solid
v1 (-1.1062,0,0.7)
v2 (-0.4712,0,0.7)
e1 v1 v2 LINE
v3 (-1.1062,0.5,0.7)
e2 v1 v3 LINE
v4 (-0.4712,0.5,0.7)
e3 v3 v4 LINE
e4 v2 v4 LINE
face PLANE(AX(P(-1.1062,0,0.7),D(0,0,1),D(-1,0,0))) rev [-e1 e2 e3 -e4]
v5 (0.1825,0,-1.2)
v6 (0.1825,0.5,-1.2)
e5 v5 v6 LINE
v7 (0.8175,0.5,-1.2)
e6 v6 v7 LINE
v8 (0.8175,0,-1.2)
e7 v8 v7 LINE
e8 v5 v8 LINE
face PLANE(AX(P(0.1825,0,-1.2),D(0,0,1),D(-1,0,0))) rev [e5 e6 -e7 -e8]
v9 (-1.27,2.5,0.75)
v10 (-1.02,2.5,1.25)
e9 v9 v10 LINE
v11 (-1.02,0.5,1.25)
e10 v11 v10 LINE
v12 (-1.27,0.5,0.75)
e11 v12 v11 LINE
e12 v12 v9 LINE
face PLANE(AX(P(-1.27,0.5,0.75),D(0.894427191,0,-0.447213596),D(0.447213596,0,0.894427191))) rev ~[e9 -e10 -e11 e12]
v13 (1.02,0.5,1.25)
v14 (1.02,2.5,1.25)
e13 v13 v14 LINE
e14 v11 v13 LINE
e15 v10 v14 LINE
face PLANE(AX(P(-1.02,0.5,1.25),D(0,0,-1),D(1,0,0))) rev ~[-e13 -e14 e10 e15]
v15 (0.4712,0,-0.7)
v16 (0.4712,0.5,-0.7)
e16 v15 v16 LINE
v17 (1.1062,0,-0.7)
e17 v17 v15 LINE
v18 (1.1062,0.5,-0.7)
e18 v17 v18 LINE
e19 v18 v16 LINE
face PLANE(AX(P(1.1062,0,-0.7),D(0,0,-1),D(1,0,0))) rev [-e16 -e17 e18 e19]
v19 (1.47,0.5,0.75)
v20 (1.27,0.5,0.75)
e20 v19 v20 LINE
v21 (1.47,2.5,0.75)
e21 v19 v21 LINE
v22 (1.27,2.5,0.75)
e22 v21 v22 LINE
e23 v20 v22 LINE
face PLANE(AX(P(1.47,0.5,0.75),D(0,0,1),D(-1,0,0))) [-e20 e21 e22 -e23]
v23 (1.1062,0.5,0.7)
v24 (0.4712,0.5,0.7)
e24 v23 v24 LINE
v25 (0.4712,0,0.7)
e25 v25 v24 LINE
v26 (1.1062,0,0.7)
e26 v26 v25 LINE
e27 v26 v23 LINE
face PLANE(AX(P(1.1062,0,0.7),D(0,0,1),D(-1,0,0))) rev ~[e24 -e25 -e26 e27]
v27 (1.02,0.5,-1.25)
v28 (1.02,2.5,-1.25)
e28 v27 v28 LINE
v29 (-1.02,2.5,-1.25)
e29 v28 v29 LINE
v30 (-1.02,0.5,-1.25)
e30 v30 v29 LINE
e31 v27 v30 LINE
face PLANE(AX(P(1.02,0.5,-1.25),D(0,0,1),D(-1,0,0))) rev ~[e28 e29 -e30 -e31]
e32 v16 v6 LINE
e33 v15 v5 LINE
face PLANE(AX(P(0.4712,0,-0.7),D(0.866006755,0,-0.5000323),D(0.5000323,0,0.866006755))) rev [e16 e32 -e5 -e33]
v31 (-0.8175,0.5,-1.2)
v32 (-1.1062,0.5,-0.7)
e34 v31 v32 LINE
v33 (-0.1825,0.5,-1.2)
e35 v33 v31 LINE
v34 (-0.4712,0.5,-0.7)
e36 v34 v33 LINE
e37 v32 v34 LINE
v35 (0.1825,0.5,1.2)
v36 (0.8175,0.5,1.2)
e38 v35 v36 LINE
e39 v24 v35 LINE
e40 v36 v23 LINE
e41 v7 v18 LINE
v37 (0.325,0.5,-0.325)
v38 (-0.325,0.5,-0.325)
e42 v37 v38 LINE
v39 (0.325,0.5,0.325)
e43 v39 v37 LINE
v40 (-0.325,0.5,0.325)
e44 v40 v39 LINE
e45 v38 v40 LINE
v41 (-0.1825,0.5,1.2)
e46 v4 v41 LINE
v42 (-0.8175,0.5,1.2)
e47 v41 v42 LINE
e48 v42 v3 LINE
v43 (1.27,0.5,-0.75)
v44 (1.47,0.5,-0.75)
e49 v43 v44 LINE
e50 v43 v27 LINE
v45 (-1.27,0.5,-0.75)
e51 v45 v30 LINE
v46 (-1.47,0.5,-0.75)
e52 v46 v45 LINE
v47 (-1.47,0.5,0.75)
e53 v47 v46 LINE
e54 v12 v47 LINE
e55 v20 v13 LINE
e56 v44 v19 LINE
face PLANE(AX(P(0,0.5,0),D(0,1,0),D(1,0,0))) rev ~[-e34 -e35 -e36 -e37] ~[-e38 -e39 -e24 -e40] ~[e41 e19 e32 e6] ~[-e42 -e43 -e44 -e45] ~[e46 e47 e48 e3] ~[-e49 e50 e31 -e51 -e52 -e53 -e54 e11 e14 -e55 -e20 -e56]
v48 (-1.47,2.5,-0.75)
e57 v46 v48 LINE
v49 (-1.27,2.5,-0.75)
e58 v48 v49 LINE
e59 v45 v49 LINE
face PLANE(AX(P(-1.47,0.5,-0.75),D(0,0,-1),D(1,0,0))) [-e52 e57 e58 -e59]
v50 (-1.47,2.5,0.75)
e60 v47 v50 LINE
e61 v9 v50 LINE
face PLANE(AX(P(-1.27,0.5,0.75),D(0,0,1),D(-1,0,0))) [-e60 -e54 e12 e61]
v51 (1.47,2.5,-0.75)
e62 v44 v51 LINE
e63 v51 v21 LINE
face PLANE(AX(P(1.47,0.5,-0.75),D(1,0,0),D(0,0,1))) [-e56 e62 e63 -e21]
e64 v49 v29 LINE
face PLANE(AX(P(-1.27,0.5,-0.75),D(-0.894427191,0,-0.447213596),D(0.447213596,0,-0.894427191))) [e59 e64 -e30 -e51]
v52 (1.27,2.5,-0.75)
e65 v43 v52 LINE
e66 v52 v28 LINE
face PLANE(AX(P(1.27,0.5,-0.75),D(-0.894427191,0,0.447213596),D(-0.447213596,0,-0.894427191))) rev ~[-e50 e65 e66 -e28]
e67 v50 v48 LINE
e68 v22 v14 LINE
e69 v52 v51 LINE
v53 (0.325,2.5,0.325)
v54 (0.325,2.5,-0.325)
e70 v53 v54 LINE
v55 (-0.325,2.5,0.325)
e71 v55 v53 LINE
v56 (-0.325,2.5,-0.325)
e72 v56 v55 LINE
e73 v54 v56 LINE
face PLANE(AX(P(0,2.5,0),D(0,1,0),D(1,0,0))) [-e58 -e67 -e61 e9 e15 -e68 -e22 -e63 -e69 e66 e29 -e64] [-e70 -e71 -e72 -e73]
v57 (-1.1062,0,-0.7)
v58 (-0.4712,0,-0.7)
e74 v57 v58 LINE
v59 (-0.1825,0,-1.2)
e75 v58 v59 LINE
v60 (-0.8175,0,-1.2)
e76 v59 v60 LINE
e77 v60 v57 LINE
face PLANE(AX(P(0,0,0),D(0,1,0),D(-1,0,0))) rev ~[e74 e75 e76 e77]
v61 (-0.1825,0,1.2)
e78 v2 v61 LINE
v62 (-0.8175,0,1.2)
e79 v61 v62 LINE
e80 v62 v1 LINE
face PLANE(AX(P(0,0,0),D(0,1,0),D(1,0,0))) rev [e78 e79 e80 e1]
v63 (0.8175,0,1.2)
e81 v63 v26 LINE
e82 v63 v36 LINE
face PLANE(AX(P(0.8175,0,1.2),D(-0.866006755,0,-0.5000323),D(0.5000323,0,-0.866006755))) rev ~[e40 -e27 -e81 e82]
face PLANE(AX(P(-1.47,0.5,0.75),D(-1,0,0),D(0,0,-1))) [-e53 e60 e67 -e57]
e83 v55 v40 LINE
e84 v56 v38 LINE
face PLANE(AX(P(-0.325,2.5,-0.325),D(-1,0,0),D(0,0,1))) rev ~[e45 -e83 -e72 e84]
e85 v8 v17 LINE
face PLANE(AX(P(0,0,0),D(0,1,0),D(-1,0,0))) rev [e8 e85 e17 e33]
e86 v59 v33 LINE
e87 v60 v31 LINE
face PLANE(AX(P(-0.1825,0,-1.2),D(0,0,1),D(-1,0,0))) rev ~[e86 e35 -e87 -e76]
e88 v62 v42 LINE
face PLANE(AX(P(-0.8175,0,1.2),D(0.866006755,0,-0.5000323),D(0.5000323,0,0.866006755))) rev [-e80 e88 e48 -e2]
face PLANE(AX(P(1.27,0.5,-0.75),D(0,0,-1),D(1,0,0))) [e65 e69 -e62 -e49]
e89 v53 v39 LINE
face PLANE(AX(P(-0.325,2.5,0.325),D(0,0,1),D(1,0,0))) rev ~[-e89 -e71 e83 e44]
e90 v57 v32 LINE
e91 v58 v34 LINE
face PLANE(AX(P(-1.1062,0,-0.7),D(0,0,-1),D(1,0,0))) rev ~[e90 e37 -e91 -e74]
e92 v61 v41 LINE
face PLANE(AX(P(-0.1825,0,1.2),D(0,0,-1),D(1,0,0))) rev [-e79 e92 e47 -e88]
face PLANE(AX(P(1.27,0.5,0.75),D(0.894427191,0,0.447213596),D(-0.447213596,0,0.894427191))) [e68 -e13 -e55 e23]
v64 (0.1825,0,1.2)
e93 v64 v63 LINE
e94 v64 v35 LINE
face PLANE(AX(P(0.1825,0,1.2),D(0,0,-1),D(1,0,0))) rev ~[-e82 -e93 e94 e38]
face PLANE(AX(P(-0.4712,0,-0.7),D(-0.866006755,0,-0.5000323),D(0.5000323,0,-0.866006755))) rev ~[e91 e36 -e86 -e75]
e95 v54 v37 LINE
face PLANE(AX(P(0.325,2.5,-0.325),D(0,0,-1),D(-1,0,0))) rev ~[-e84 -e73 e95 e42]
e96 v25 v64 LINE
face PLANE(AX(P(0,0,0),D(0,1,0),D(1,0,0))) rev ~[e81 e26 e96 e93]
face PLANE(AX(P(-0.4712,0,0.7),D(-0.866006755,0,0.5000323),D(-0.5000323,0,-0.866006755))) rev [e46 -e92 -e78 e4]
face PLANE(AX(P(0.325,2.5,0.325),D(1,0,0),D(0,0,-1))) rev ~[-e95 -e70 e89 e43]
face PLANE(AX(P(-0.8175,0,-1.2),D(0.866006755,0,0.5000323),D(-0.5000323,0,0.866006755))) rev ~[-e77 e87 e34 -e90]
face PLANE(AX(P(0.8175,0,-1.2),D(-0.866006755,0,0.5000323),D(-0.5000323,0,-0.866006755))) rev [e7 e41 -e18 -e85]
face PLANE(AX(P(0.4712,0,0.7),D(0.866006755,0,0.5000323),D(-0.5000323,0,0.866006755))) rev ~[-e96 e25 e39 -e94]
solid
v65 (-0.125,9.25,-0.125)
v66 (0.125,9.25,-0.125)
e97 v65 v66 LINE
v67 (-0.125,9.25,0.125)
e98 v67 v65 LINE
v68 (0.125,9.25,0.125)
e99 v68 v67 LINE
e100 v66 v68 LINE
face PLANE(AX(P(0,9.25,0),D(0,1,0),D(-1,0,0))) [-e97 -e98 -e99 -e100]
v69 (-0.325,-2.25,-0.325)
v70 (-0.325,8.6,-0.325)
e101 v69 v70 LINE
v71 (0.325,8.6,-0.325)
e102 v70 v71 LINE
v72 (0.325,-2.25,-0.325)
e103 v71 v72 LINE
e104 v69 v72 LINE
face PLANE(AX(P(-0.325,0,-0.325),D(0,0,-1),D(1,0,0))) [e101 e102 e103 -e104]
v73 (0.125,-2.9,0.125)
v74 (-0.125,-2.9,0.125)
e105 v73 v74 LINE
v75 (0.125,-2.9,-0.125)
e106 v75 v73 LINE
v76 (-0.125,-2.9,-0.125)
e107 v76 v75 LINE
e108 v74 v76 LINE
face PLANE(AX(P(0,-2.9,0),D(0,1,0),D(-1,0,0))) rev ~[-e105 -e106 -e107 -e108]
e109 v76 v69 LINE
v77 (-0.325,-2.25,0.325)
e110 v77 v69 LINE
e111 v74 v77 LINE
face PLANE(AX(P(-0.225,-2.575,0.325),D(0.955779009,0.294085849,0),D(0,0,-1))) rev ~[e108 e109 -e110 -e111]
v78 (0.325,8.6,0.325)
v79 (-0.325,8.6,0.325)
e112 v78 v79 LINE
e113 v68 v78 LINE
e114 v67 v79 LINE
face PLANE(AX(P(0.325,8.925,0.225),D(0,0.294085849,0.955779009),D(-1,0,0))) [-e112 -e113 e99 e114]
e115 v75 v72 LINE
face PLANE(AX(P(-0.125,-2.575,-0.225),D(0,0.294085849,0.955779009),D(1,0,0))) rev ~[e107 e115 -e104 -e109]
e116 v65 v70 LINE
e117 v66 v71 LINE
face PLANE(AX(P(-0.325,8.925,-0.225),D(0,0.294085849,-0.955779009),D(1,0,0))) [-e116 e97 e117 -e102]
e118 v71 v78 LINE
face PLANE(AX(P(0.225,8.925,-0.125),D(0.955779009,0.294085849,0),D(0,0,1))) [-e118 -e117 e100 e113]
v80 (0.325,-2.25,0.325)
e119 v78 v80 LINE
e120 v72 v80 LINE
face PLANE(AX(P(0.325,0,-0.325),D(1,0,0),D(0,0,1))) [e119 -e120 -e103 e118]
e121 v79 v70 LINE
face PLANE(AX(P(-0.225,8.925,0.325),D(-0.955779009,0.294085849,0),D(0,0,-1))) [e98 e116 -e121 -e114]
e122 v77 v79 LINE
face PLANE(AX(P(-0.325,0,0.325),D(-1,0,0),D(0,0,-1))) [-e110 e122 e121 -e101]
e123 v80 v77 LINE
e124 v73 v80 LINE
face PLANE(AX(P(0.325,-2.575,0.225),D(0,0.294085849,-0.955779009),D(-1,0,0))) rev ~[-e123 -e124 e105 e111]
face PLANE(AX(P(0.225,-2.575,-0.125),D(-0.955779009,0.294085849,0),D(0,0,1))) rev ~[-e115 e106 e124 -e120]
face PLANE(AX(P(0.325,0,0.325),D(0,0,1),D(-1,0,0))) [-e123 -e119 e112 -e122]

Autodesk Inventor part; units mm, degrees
ref_plane "YZ Plane" through (0, 0, 0) normal (1, 0, 0) x (0, 1, 0)
ref_plane "XZ Plane" through (0, 0, 0) normal (0, 1, 0) x (-1, 0, 0)
ref_plane "XY Plane" through (0, 0, 0) normal (0, 0, 1) x (1, 0, 0)
sketch "Sketch1" plane through (0, 0, 0) normal (0, 1, 0) x (-1, 0, 0)
  line L0 (1.02, 1.25) -> (1.27, 0.75)
  line L1 (-1.02, 1.25) -> (1.02, 1.25)
  line L2 (-1.27, -0.75) -> (-1.27, 0.75)
  line L3 (-1.02, -1.25) -> (-1.27, -0.75)
  line L4 (1.02, -1.25) -> (-1.02, -1.25)
  line L5 (1.27, -0.75) -> (1.02, -1.25)
  line L6 (1.27, 0.75) -> (1.27, -0.75)
  line L7 (1.02, 1.25) -> (1.27, 0.75)
  line L8 (-1.02, 1.25) -> (1.02, 1.25)
  line L9 (-1.27, 0.75) -> (-1.02, 1.25)
  line L10 (0.815, 1.2) -> (0.18, 1.2)
  line L11 (1.1037, 0.7) -> (0.815, 1.2)
  line L12 (0.4687, 0.7) -> (1.1037, 0.7)
  line L13 (0.18, 1.2) -> (0.4687, 0.7)
  line L14 (-0.815, 1.2) -> (-1.1037, 0.7)
  line L15 (-0.18, 1.2) -> (-0.815, 1.2)
  line L16 (-0.4687, 0.7) -> (-0.18, 1.2)
  line L17 (-1.1037, 0.7) -> (-0.4687, 0.7)
  line L18 (0.815, -1.2) -> (1.1037, -0.7)
  line L19 (0.18, -1.2) -> (0.815, -1.2)
  line L20 (0.4687, -0.7) -> (0.18, -1.2)
  line L21 (1.1037, -0.7) -> (0.4687, -0.7)
  line L22 (-0.815, -1.2) -> (-0.18, -1.2)
  line L23 (-1.1037, -0.7) -> (-0.815, -1.2)
  line L24 (-0.4687, -0.7) -> (-1.1037, -0.7)
  line L25 (-0.18, -1.2) -> (-0.4687, -0.7)
  line L26 (-0.325, 0.325) -> (0.325, 0.325)
  line L27 (0.325, 0.325) -> (0.325, -0.325)
  line L28 (-0.325, -0.325) -> (0.325, -0.325)
  line L29 (-0.325, 0.325) -> (-0.325, -0.325)
  point P0 (0, 0)
  point P1 (0, 0)
sketch "Sketch3" plane through (0, 0, 0) normal (0, 1, 0) x (-1, 0, 0)
  line L0 (1.1062, -0.7) -> (0.4712, -0.7)
  line L1 (0.4712, -0.7) -> (0.1825, -1.2)
  line L2 (0.1825, -1.2) -> (0.8175, -1.2)
  line L3 (0.8175, -1.2) -> (1.1062, -0.7)
  line L4 (0.5, -1.2) -> (0.5, -0.7) construction
  point P0 (0, 0)
  dimension "d58" = 120
  dimension "d60" = 0.7
  dimension "d61" = 0.635
  dimension "d62" = 0.5
  dimension "d65" = 0.5
extrude "PCB-Level" add sketch "Sketch3" along normal blind 0.5
mirror "PCB-Level-Mirror1" about plane through (0, 0, 0) normal (1, 0, 0) of "PCB-Level"
mirror "PCB_Level-Mirror2" about plane through (0, 0, 0) normal (0, 0, 1) of "PCB-Level", "PCB-Level-Mirror1"
sketch "Sketch4" plane through (0, 0.5, 0) normal (0, 1, 0) x (1, 0, 0)
  line L0 (-1.02, -1.25) -> (1.02, -1.25)
  line L1 (1.27, -0.75) -> (1.27, 0.75)
  line L2 (1.02, 1.25) -> (-1.02, 1.25)
  line L3 (-1.27, 0.75) -> (-1.27, -0.75)
  line L4 (-1.27, -1.25) -> (1.27, 1.25) construction
  line L5 (1.27, -1.25) -> (-1.27, 1.25) construction
  line L6 (1.27, -0.75) -> (1.02, -1.25)
  line L7 (1.27, 0.75) -> (1.02, 1.25)
  line L8 (-1.27, 0.75) -> (-1.02, 1.25)
  line L9 (-1.27, -0.75) -> (-1.02, -1.25)
  line L10 (-1.02, -1.25) -> (1.02, -1.25)
  line L11 (1.27, 0.75) -> (1.47, 0.75)
  line L12 (1.47, 0.75) -> (1.47, -0.75)
  line L13 (1.47, -0.75) -> (1.27, -0.75)
  line L14 (1.27, -0.75) -> (1.27, 0.75)
  line L15 (-1.27, -0.75) -> (-1.47, -0.75)
  line L16 (-1.47, -0.75) -> (-1.47, 0.75)
  line L17 (-1.47, 0.75) -> (-1.27, 0.75)
  line L18 (-1.27, 0.75) -> (-1.27, -0.75)
  point P0 (0, 0)
  dimension "d68" = 2.54
  dimension "d69" = 2.5
  dimension "d70" = 0.5
  dimension "d71" = 0.25
  dimension "d72" = 0.5
  dimension "d73" = 0.25
  dimension "d74" = 0.5
  dimension "d75" = 0.25
  dimension "d76" = 0.5
  dimension "d77" = 0.25
  dimension "d122" = 0.2
  dimension "d123" = 0.2
sketch "Sketch6" plane through (0, 0, 0) normal (0, 1, 0) x (-1, 0, 0)
  line L0 (0.325, -0.325) -> (-0.325, -0.325) projected
  line L1 (-0.325, -0.325) -> (-0.325, 0.325) projected
  line L2 (-0.325, 0.325) -> (0.325, 0.325) projected
  line L3 (0.325, 0.325) -> (0.325, -0.325) projected
  point P0 (0, 0)
extrude "Pin-Ext" add sketch "Sketch6" along normal blind 9.25 and the other way blind 2.9 separate body
chamfer "Chamfer1" distance 0.2 distance2 0.65 1 edges at (0, 9.25, -0.325) measured on face at (-0.1083, 9.25, -0.1083)
chamfer "Chamfer2" distance 0.2 distance2 0.65 1 edges at (-0.325, 9.25, 0.1) measured on face at (0.1083, 9.25, 0.175)
chamfer "Chamfer3" distance 0.2 distance2 0.65 1 edges at (0.1, 9.25, 0.325) measured on face at (0.175, 9.25, 0.175)
chamfer "Chamfer4" distance 0.2 distance2 0.65 1 edges at (0.325, 9.25, 0) measured on face at (0.175, 9.25, 0.0417)
chamfer "Chamfer5" distance 0.2 distance2 0.65 1 edges at (-0.325, -2.9, 0) measured on face at (-0.1083, -2.9, -0.1083)
chamfer "Chamfer6" distance 0.2 distance2 0.65 1 edges at (0.1, -2.9, 0.325) measured on face at (0.025, -2.9, -0.1083)
chamfer "Chamfer7" distance 0.2 distance2 0.65 1 edges at (0.1, -2.9, -0.325) measured on face at (0.025, -2.9, -0.175)
chamfer "Chamfer8" distance 0.2 distance2 0.65 1 edges at (0.325, -2.9, 0) measured on face at (0.025, -2.9, -0.0417)
extrude "Extrusion9" add sketch "Sketch4" along normal blind 2 bodies 1
sketch "Sketch9" plane through (0, 2.5, 0) normal (0, 1, 0) x (1, 0, 0)
  line L0 (0.325, 0.325) -> (-0.325, 0.325) projected
  line L1 (0.325, -0.325) -> (0.325, 0.325) projected
  line L2 (-0.325, -0.325) -> (0.325, -0.325) projected
  line L3 (-0.325, 0.325) -> (-0.325, -0.325) projected
  point P0 (0, 0)
extrude "Extrusion10" cut sketch "Sketch9" against normal through all bodies 1
equation "\"d74\" = d72"
equation "\"d75\" = d73"
equation "\"d76\" = d72"
equation "\"d77\" = d73"
properties part number "C-Pin"
